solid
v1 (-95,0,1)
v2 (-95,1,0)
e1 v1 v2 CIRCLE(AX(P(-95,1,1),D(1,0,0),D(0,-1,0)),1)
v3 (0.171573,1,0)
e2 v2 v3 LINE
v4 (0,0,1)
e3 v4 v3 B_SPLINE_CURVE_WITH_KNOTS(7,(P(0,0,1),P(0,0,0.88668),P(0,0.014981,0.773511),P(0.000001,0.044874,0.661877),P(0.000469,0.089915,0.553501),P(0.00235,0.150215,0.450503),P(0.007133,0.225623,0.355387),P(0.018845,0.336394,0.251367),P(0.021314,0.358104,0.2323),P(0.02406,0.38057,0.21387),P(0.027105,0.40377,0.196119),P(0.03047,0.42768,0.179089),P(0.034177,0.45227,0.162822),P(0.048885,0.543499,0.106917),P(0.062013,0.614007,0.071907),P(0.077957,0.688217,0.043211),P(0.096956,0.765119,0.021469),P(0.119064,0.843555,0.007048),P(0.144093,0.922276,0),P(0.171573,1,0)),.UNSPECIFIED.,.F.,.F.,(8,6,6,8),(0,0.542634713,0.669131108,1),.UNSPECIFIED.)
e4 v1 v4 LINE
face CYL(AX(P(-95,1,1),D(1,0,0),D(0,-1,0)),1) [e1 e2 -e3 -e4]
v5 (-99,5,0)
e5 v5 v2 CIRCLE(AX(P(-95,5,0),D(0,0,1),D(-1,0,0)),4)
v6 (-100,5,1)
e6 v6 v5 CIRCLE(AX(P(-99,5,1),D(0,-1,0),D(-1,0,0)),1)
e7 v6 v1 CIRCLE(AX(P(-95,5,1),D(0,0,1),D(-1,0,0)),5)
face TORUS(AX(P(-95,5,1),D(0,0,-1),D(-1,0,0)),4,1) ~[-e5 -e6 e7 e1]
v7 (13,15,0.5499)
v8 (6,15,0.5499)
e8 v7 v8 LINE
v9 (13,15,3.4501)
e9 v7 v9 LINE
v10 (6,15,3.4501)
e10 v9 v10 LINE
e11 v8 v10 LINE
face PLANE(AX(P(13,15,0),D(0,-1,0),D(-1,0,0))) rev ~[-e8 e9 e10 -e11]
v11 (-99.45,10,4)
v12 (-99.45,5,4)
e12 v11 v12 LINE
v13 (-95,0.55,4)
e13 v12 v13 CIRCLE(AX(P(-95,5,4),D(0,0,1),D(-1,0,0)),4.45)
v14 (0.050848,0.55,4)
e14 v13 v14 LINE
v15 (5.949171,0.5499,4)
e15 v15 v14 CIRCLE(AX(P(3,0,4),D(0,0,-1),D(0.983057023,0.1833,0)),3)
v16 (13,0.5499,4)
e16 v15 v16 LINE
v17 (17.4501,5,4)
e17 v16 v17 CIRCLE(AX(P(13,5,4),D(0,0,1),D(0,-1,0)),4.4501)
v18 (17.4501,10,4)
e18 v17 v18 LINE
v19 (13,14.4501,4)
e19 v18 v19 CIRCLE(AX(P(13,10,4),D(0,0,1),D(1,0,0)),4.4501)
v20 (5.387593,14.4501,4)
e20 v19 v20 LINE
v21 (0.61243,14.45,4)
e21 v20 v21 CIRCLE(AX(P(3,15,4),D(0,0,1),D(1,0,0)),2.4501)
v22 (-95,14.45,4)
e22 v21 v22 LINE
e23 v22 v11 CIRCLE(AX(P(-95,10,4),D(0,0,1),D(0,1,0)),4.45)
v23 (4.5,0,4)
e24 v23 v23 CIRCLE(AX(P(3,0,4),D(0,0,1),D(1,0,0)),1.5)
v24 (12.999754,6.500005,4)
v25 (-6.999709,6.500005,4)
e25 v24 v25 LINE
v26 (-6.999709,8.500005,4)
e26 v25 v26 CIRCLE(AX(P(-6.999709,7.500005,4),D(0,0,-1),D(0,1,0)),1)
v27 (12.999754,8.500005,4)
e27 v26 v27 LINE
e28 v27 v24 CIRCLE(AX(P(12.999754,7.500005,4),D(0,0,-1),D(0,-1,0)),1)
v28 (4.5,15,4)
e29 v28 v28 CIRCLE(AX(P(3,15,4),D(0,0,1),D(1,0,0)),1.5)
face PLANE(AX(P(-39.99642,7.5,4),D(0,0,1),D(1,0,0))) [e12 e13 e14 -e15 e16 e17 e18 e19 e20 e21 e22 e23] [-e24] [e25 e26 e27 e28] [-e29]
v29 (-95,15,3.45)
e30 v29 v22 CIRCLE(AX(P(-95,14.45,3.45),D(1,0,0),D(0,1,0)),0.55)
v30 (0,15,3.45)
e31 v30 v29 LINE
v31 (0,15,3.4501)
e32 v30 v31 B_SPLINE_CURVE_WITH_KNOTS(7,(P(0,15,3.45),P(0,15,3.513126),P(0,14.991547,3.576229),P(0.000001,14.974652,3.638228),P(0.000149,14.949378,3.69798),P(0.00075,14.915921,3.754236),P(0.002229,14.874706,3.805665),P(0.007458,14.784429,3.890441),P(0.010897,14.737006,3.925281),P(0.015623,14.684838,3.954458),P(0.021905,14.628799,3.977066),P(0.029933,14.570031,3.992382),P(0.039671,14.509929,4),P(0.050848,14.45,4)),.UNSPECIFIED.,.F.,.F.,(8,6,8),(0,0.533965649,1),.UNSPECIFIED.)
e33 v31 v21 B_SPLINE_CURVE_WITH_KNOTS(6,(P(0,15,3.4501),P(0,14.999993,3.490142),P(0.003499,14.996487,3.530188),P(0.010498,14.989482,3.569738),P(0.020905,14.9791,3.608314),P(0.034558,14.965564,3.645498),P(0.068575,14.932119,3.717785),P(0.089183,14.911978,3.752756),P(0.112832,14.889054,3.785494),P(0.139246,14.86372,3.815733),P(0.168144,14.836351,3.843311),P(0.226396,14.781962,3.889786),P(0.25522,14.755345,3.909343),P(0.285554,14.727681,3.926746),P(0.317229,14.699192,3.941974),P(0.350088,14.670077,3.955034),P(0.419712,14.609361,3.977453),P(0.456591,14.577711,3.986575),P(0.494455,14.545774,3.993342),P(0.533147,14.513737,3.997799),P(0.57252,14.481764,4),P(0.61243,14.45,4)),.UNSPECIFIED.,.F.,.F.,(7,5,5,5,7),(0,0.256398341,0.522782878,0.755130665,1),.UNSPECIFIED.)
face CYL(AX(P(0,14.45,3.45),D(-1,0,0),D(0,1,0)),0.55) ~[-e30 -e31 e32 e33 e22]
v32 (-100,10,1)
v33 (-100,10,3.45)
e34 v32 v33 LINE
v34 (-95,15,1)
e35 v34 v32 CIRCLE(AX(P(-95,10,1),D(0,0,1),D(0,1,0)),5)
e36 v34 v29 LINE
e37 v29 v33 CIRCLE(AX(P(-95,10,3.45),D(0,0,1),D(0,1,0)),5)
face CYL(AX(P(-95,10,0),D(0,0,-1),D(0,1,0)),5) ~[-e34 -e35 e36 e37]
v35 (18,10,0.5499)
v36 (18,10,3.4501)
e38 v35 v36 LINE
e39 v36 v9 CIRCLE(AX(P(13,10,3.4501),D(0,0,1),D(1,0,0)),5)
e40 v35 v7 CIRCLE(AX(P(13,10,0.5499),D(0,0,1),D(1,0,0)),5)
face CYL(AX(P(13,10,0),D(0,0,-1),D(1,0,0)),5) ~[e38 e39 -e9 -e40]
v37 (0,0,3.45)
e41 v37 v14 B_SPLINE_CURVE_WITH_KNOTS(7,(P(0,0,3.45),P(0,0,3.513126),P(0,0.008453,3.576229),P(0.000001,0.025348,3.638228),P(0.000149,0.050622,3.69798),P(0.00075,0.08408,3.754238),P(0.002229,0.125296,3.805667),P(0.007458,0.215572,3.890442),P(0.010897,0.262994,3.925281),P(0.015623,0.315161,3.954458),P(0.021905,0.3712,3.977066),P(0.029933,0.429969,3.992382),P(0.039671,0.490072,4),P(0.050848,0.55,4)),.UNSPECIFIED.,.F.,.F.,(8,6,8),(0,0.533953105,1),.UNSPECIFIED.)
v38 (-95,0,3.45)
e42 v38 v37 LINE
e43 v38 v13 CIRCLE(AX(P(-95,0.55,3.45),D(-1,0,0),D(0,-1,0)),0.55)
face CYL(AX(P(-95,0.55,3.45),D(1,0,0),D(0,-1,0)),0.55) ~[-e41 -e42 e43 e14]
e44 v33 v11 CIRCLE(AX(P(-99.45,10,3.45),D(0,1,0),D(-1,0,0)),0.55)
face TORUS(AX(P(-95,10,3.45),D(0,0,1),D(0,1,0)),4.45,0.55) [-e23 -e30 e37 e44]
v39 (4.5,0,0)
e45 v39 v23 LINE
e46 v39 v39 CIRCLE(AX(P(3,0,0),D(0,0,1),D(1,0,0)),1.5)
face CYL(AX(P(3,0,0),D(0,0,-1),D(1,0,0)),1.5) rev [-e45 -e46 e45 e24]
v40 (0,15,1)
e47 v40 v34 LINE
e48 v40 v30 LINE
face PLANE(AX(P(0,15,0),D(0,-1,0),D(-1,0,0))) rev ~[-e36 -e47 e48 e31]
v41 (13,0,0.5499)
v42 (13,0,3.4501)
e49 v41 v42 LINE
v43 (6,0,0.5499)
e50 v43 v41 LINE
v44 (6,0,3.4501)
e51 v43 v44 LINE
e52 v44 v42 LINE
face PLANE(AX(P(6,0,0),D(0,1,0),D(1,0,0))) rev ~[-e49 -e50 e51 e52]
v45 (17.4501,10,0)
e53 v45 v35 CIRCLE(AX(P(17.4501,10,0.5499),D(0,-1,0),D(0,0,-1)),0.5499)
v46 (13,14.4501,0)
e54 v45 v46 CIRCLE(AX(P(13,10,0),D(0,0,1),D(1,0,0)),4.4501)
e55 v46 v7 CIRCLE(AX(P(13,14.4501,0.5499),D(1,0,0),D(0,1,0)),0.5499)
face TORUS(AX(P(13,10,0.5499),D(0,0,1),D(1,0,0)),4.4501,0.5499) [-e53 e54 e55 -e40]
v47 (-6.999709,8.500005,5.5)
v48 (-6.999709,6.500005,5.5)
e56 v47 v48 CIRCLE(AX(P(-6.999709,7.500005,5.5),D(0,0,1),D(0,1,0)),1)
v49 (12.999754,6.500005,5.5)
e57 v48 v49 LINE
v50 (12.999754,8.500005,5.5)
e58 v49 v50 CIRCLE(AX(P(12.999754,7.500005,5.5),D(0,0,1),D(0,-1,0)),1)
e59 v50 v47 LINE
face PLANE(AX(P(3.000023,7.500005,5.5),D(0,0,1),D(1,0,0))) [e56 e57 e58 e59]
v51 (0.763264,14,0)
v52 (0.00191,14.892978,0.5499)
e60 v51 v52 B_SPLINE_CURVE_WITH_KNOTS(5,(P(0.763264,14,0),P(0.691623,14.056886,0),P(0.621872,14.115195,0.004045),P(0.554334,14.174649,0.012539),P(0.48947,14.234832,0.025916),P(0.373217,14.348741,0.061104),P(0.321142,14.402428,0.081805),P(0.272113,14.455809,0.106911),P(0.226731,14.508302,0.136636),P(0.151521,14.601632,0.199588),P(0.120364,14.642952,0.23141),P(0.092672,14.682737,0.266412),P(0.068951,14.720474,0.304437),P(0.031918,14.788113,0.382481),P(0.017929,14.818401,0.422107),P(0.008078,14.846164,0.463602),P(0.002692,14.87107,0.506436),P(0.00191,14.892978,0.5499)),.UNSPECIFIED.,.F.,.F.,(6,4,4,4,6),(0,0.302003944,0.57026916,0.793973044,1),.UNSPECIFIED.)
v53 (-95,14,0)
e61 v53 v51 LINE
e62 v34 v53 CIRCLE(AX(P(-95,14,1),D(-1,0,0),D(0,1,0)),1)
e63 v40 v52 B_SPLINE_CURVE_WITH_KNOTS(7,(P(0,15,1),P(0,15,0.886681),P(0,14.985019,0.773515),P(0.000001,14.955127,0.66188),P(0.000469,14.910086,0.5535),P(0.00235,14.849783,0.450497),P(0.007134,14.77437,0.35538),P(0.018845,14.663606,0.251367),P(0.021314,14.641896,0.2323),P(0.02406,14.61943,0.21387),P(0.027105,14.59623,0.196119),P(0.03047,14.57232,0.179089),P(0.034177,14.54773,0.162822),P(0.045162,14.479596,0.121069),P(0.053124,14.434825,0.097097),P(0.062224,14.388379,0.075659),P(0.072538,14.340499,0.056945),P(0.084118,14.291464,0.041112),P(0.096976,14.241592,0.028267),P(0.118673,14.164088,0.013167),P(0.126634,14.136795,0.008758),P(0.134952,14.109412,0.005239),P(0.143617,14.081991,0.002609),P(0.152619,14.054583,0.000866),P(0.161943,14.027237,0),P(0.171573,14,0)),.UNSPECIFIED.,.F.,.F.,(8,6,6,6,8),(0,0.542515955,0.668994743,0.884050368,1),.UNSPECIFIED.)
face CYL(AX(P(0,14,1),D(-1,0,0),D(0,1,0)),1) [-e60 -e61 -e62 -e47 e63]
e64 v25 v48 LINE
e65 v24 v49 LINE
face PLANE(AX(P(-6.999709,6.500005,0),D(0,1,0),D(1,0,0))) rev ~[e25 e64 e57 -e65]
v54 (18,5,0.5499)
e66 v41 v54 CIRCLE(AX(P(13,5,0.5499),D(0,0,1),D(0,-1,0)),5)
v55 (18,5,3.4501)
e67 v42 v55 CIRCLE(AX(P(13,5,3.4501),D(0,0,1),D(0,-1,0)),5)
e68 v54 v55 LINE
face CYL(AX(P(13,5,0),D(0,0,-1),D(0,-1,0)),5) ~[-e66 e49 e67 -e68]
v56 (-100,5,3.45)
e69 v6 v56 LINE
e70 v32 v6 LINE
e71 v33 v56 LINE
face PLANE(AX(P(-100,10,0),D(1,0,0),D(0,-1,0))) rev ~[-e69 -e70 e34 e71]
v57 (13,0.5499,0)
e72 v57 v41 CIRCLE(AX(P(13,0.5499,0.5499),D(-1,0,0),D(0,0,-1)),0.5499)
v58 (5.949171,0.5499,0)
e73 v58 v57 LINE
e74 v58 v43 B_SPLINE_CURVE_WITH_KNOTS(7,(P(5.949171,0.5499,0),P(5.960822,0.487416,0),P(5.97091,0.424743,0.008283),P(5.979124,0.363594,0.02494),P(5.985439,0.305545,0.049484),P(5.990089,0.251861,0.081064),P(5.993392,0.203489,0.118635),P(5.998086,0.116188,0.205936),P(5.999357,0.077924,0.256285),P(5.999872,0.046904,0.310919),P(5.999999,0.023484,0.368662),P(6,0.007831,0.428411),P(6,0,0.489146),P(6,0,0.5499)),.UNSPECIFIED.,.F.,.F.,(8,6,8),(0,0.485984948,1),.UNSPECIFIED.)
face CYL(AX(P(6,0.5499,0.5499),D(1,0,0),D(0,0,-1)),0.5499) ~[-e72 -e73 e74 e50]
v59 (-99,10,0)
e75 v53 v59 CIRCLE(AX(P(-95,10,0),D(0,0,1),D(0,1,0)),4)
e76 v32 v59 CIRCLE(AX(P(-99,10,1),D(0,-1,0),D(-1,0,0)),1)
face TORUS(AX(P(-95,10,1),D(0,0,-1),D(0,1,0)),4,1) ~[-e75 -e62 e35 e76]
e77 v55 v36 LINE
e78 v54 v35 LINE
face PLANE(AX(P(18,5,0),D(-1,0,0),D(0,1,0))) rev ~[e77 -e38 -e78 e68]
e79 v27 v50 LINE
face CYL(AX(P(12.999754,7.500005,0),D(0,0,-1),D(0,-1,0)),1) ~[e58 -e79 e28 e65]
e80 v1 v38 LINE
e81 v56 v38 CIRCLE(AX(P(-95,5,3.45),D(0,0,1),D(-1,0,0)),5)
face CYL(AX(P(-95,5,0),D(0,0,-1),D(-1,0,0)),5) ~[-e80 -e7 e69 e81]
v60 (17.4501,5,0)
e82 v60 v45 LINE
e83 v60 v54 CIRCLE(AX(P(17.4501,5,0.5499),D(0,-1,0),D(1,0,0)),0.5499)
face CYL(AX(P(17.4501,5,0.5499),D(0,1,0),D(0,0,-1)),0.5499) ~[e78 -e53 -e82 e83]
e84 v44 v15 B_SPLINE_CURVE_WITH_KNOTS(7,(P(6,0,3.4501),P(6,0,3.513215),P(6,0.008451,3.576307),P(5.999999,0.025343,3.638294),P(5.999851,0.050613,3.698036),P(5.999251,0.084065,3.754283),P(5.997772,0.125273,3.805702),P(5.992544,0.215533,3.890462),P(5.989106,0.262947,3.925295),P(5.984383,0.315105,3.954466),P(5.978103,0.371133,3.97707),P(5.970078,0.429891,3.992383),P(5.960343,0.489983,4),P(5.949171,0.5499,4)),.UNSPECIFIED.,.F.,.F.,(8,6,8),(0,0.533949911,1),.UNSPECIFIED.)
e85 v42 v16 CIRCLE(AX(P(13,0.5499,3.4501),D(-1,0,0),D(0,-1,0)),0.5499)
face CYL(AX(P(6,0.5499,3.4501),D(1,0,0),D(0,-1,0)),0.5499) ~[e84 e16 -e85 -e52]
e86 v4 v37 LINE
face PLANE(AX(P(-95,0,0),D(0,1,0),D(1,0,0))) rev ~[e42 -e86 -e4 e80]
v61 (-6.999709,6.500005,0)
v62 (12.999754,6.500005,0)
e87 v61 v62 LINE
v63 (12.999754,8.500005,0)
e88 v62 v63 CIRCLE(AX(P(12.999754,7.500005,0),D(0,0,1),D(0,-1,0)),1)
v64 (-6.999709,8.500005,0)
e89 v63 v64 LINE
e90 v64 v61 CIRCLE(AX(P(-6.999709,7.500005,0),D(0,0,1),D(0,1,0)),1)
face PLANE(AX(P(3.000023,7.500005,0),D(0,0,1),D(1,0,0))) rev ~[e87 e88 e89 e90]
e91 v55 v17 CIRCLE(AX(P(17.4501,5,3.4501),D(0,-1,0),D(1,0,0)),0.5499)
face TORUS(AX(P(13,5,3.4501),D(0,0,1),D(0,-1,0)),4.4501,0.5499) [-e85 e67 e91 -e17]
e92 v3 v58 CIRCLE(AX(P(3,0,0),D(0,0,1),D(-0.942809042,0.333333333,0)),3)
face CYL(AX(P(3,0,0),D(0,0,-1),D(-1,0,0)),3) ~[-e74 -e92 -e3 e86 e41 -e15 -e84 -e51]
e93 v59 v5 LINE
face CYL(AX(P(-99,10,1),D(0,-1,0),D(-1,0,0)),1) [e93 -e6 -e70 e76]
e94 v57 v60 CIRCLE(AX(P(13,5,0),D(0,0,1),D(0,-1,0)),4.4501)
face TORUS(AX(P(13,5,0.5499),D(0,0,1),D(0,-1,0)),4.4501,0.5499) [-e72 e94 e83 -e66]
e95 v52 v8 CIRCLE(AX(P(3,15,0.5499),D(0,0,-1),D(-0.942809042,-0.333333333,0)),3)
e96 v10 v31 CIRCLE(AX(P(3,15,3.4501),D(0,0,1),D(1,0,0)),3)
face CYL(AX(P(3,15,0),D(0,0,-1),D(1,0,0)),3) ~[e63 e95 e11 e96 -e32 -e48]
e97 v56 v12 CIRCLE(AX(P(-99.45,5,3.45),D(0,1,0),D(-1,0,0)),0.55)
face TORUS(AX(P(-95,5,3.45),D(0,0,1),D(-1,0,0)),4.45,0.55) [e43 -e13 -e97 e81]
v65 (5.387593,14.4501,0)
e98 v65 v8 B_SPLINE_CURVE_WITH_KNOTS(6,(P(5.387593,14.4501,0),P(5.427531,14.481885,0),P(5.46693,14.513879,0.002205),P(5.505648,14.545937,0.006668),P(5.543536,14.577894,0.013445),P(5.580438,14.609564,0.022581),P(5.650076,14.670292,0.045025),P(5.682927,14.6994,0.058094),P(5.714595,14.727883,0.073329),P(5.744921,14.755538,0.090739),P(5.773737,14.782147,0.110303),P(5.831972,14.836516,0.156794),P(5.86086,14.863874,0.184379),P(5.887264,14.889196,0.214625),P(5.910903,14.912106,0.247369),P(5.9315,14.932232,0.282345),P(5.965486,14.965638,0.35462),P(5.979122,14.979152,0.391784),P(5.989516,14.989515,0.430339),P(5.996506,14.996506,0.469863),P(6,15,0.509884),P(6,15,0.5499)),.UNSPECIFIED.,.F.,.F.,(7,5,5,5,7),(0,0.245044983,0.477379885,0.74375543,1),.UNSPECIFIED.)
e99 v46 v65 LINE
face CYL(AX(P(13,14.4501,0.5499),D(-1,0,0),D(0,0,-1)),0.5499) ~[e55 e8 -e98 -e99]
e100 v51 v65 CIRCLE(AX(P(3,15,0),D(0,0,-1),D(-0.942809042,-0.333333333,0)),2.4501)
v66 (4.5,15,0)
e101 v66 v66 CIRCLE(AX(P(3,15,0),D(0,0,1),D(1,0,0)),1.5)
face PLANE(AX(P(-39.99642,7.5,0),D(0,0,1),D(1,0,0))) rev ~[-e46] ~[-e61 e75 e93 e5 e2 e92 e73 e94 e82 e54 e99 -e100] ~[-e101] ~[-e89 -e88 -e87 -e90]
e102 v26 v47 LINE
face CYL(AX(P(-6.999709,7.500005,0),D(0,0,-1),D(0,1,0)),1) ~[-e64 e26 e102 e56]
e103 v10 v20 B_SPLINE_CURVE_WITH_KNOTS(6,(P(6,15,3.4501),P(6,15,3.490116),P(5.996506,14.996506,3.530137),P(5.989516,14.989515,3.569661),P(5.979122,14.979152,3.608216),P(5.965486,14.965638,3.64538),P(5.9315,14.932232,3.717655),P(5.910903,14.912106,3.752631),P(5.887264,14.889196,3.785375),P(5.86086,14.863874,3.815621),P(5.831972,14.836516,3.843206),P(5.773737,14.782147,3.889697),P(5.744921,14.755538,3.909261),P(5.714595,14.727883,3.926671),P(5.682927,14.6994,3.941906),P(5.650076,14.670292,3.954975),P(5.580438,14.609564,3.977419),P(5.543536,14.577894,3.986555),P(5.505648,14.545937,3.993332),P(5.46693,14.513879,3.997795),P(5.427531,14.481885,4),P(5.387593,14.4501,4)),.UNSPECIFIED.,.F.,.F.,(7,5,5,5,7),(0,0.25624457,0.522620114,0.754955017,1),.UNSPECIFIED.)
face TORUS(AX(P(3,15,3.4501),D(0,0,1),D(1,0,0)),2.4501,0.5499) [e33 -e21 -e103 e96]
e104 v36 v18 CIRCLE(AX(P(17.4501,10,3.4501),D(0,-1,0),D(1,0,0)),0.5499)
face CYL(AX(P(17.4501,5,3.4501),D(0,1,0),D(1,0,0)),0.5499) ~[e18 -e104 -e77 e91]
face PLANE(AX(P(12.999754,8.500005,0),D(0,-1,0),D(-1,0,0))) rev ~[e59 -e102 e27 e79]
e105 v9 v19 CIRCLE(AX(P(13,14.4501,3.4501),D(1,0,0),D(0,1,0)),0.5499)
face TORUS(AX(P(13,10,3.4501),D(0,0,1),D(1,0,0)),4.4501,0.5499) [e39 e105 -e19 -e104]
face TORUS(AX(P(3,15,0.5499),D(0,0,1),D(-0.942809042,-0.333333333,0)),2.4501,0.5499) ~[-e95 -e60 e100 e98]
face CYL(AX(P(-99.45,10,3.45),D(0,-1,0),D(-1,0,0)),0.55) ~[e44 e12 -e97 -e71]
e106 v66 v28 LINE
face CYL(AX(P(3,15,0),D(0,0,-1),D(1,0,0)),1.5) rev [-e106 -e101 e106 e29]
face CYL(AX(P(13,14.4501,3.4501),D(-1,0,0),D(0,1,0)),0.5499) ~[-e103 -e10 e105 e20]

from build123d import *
from build123d import SkipClean  # not in build123d's __all__

# Parameters (mm, degrees)
F0_R     = 1.5
F1_DEPTH = 4
F2_R     = 0.55
F3_R     = 1
F4_R     = 0.5499
F6_DEPTH = 5.5


# Not quite as in the source:
# - a fillet or chamfer is up to 0.001 mm smaller than in the source, because OpenCascade refuses the exact size
# - a feature names something its author has since deleted; it is built from what else it names


with BuildPart() as f1:
    # F0 (on Top) → F1 (new body)
    with BuildSketch(Plane.XY):
        with BuildLine():
            Line((-95, 0), (0, 0))
            ThreePointArc((0, 0), (3, -3), (6, 0))
            Line((6, 0), (13, 0))
            ThreePointArc((13, 0), (16.5355339059, 1.4644660941), (18, 5))
            Line((18, 5), (18, 10))
            ThreePointArc((18, 10), (16.5355339059, 13.5355339059), (13, 15))
            Line((13, 15), (6, 15))
            ThreePointArc((6, 15), (3, 18), (0, 15))
            Line((0, 15), (-95, 15))
            ThreePointArc((-95, 15), (-98.5355339059, 13.5355339059), (-100, 10))
            Line((-100, 10), (-100, 5))
            ThreePointArc((-100, 5), (-98.5355339059, 1.4644660941), (-95, 0))
        make_face()
        with Locations((3, 0)):
            Circle(F0_R, mode=Mode.SUBTRACT)
        with Locations((3, 15)):
            Circle(F0_R, mode=Mode.SUBTRACT)
    extrude(amount=F1_DEPTH)

    # F2
    f2_edges = [f1.edges().sort_by_distance(p)[0] for p in [
        (-47.5, 0, 4),
    ]]
    fillet(f2_edges, radius=F2_R)

    # F3
    f3_edges = [f1.edges().sort_by_distance(p)[0] for p in [
        (-47.5, 0, 0),
    ]]
    fillet(f3_edges, radius=F3_R)

    # F4 (radius 0.55 in the source; OpenCascade refuses exactly that, so slightly less here)
    f4_edges = [f1.edges().sort_by_distance(p)[0] for p in [
        (3, 18, 4),
        (3, 18, 0),
        (9.5, 0, 4),
        (16.535534, 13.535534, 4),
        (16.535534, 1.464466, 4),
        (16.535534, 13.535534, 0),
        (16.535534, 1.464466, 0),
        (9.5, 0, 0),
        (9.5, 15, 0),
        (9.5, 15, 4),
    ]]
    fillet(f4_edges, radius=F4_R)

    # F5 (on Top) → F6 (join)
    with BuildSketch(Plane.XY):
        with BuildLine():
            Line((12.9997539334, 8.5000049546), (-6.9997087121, 8.5000049546))
            ThreePointArc((-6.9997087121, 8.5000049546), (-7.9997087121, 7.5000049546), (-6.9997087121, 6.5000049546))
            Line((-6.9997087121, 6.5000049546), (12.9997539334, 6.5000049546))
            ThreePointArc((12.9997539334, 6.5000049546), (13.9997539334, 7.5000049546), (12.9997539334, 8.5000049546))
        make_face()
    with SkipClean():  # cleaning this boolean's faces spoils the solid; the shape is the same uncleaned
        extrude(amount=F6_DEPTH)


solid = f1.part
